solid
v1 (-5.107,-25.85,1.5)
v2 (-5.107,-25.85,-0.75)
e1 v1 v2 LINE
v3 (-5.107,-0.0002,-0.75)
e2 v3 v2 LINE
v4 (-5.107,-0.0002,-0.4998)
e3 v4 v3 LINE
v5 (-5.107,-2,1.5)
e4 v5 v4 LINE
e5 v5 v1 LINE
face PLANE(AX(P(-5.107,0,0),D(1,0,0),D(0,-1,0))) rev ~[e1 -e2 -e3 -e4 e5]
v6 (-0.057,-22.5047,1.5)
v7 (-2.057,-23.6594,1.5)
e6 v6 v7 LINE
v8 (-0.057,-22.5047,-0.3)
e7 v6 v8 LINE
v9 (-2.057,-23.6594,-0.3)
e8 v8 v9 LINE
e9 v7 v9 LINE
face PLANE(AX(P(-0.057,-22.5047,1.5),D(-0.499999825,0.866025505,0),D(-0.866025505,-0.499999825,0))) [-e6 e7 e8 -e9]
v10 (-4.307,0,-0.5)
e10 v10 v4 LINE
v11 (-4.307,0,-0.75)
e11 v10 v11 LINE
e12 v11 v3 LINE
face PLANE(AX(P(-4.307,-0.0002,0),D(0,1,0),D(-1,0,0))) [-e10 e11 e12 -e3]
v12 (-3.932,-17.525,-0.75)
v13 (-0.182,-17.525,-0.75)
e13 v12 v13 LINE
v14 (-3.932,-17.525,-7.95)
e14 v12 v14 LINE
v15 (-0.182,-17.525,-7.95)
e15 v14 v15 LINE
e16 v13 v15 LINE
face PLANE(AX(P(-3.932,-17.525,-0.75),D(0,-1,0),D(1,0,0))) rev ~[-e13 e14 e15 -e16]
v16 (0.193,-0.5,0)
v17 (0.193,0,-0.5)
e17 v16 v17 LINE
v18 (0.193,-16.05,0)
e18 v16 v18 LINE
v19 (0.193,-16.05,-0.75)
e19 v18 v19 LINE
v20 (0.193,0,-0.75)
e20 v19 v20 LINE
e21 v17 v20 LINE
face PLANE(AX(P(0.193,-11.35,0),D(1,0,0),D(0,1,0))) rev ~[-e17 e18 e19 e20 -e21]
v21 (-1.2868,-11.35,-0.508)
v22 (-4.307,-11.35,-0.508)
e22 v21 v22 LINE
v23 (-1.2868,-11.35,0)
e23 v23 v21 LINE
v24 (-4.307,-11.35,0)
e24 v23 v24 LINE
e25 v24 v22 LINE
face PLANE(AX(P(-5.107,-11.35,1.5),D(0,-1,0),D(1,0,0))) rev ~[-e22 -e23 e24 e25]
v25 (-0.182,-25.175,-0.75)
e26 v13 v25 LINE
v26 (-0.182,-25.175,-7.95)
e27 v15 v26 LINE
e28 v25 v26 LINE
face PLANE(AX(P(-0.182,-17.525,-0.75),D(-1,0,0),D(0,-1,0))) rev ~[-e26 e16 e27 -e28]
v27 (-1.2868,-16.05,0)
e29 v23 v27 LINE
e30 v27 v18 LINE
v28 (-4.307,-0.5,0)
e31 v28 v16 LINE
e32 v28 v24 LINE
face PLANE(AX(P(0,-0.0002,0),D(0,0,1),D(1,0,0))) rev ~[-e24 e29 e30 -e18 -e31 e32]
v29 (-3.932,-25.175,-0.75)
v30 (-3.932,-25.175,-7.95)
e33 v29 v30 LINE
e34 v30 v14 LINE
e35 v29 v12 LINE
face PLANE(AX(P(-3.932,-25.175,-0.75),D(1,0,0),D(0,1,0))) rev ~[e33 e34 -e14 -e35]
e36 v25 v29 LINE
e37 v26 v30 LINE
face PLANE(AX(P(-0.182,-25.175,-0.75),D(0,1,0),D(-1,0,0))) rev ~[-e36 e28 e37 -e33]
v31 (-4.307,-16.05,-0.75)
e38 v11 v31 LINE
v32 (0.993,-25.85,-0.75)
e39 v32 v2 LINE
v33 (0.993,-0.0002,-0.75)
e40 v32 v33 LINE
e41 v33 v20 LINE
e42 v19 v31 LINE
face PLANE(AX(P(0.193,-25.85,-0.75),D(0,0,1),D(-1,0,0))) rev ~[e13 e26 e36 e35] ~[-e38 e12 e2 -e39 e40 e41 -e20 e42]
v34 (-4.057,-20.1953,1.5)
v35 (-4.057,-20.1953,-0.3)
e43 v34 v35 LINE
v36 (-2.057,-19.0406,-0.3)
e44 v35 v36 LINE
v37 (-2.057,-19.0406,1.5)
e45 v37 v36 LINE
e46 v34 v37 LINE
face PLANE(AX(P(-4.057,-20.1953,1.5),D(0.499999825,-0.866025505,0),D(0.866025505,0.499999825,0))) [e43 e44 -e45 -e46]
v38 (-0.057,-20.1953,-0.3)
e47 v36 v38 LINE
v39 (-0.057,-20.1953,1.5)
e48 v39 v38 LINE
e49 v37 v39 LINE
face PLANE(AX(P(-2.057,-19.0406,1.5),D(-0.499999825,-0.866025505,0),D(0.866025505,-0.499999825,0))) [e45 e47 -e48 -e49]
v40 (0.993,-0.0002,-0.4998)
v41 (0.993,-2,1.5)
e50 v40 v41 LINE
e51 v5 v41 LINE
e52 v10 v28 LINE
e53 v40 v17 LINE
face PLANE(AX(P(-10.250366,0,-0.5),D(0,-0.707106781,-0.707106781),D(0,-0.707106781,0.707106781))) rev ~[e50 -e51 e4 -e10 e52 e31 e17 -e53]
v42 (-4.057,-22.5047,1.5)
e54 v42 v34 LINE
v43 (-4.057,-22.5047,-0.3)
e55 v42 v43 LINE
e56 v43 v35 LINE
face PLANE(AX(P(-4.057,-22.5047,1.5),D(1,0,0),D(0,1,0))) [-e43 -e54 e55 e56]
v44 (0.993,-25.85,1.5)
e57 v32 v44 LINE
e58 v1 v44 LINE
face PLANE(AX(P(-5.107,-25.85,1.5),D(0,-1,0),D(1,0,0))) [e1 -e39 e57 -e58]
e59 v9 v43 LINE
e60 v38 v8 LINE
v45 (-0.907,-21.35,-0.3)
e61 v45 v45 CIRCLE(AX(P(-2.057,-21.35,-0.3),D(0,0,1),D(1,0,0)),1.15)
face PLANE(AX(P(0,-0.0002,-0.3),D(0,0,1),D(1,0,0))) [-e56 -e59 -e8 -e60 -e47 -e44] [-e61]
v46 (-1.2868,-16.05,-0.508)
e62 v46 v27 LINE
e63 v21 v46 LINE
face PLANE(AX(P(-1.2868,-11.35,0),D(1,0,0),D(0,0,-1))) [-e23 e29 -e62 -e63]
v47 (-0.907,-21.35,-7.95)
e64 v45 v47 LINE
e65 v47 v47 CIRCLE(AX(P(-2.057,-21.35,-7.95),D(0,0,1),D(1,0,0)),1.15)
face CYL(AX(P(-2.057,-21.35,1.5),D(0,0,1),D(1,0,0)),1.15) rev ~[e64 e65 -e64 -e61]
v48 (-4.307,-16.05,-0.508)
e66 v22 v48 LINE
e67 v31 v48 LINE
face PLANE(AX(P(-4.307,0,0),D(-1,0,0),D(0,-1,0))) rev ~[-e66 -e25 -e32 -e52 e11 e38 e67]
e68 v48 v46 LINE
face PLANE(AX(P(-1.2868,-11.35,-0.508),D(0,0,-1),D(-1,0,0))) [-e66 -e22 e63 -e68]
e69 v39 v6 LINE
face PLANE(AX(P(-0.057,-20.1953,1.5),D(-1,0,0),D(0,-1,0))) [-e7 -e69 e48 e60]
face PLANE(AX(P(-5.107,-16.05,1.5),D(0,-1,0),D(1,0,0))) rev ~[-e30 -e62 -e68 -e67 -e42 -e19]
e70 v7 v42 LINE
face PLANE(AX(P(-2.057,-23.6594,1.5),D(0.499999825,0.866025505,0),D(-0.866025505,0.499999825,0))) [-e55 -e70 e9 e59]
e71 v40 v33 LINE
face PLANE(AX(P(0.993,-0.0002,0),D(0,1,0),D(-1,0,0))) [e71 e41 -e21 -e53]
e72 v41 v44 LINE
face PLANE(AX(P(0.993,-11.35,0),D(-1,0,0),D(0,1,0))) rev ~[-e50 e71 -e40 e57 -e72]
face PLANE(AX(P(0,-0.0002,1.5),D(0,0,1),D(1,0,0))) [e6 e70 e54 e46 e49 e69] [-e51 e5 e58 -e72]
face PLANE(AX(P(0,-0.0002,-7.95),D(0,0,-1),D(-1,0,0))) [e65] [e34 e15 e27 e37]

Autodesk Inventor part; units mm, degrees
ref_plane "YZ Plane" through (0, 0, 0) normal (1, 0, 0) x (0, 1, 0)
ref_plane "XZ Plane" through (0, 0, 0) normal (0, 1, 0) x (-1, 0, 0)
ref_plane "XY Plane" through (0, 0, 0) normal (0, 0, 1) x (1, 0, 0)
ref_plane "Work Plane3" through (0, -0.0002, 0) normal (0, 0, 1) x (1, 0, 0)
sketch "Sketch8" plane through (0, -0.0002, 0) normal (0, 0, 1) x (1, 0, 0)
  line L0 (-0.007, 0.0002) -> (-0.007, -15.3498) projected
  line L1 (-0.007, 0.0002) -> (-4.107, 0.0002) projected
  line L2 (-4.107, 0.0002) -> (-4.107, -11.3498) projected
  line L3 (-5.107, -11.3498) -> (0.993, -11.3498)
  line L4 (0.993, -11.3498) -> (0.993, 0.0002)
  line L5 (0.993, 0.0002) -> (-5.107, 0.0002)
  line L6 (-5.107, 0.0002) -> (-5.107, -11.3498)
  line L7 (-4.107, -11.3498) -> (-1.0868, -11.3498) projected
  point P0 (-4.107, 0.0002)
  point P1 (-0.007, 0.0002)
  point P2 (-0.007, -11.3498)
  dimension "d71" = 1
  dimension "d72" = 1
extrude "side" add sketch "Sketch8" along normal blind 1.5
sketch "Sketch14" plane through (0, -0.0002, 0) normal (0, 0, -1) x (-1, 0, 0)
  line L0 (-0.993, 0) -> (5.107, 0) projected
  line L1 (5.107, -11.3498) -> (-0.993, -11.3498) projected
  line L2 (5.107, 0.0002) -> (4.307, 0.0002)
  line L3 (4.307, 0.0002) -> (4.307, -11.3498)
  line L4 (4.307, -11.3498) -> (5.107, -11.3498)
  line L5 (5.107, -11.3498) -> (5.107, 0.0002)
  line L6 (-0.993, -11.3498) -> (-0.193, -11.3498)
  line L7 (-0.193, -11.3498) -> (-0.193, 0.0002)
  line L8 (-0.193, 0.0002) -> (-0.993, 0.0002)
  line L9 (-0.993, 0.0002) -> (-0.993, -11.3498)
  line L10 (4.107, 0.0002) -> (4.107, -11.3498) projected
  line L11 (0.007, 0.0002) -> (0.007, -15.3498) projected
  point P0 (0, 0.0002)
  point P1 (-0.993, 0.0002)
  point P2 (-0.993, 0.0002)
  point P3 (-0.193, 0.0002)
  point P4 (4.307, 0.0002)
  dimension "d73" = 0.2
  dimension "d74" = 0.2
extrude "side_tabs" add sketch "Sketch14" along normal blind 0.75 contours L0 L7 L1 L9 | L0 L5 L1 L3
sketch "Sketch15" plane through (-5.107, -11.35, 1.5) normal (0, -1, 0) x (1, 0, 0)
  line L0 (0.8, -1.5) -> (5.3, -1.5) projected
  line L1 (5.3, -1.5) -> (5.3, -2.25) projected
  line L2 (6.1, -2.25) -> (5.3, -2.25) projected
  line L3 (0, 0) -> (6.1, 0) projected
  line L4 (0.8, -2.25) -> (0, -2.25) projected
  line L5 (0.8, -1.5) -> (0.8, -2.25) projected
  line L6 (5.3, -1.5) -> (0.8, -1.5) projected
  line L7 (1, -1.5) -> (4.0182, -1.5) projected
  line L8 (0.8, -1.5) -> (0.8, -2.25) projected
  line L9 (0.8, -1.5) -> (3.8202, -1.5)
  line L10 (3.8202, -1.5) -> (3.8202, -2.008)
  line L11 (3.8202, -2.008) -> (0.8, -2.008)
  line L12 (0.8, -2.008) -> (0.8, -1.5)
  line L13 (6.1, -2.25) -> (6.1, 0) projected
  line L14 (0, 0) -> (0, -2.25) projected
  line L15 (4.0202, -1.5) -> (4.0202, -2.8009) projected
  point P0 (5.107, -1.5)
  point P1 (3.8202, -1.5)
  dimension "d99" = 0.508
  dimension "d100" = 0.2
extrude "fill_gaps" add sketch "Sketch15" along normal blind 14.5
sketch "Sketch16" plane through (-5.107, -25.85, 1.5) normal (0, -1, 0) x (1, 0, 0)
  line L0 (5.3, -2.25) -> (6.1, -2.25) projected
  line L1 (5.3, -1.5) -> (5.3, -2.25) projected
  line L2 (3.8202, -1.5) -> (5.3, -1.5) projected
  line L3 (3.8202, -2.008) -> (3.8202, -1.5) projected
  line L4 (0.8, -2.008) -> (3.8202, -2.008) projected
  line L5 (0.8, -2.25) -> (0.8, -2.008) projected
  line L6 (0, -2.25) -> (0.8, -2.25) projected
  line L7 (5.3, -2.25) -> (0.8, -2.25)
  point P0 (5.107, -1.5)
extrude "fill_gaps_2" add sketch "Sketch16" against normal blind 9.8
chamfer "Chamfer1" distance 2 angle 45 1 edges at (-2.057, 0, 1.5)
sketch "Sketch17" plane through (0, -0.0002, -0.75) normal (0, 0, -1) x (-1, 0, 0)
  line L0 (0.007, -17.3498) -> (0.007, -25.3498) projected
  line L1 (4.107, -17.3498) -> (0.007, -17.3498) projected
  line L2 (4.107, -25.3498) -> (4.107, -17.3498) projected
  line L3 (0.007, -25.3498) -> (4.107, -25.3498) projected
  line L4 (0.182, -25.1748) -> (3.932, -25.1748)
  line L5 (3.932, -25.1748) -> (3.932, -17.5248)
  line L6 (3.932, -17.5248) -> (0.182, -17.5248)
  line L7 (0.182, -17.5248) -> (0.182, -25.1748)
  point P0 (0, 0.0002)
  dimension "d86" = 0.175
  dimension "d87" = 0.175
  dimension "d88" = 0.175
  dimension "d89" = 0.175
extrude "sliding_block" add sketch "Sketch17" along normal blind 7.2 contours L7 L6 L5 L4
ref_plane "Work Plane4" through (-2.2725, -22.3901, 1.5) normal (0, 0, 1) x (1, 0, 0)
sketch "Sketch19" plane through (-2.2725, -22.3901, 1.5) normal (0, 0, 1) x (1, 0, 0)
  circle A0 centre (0.2155, 1.0401) radius 1.15 projected
  point P0 (2.2725, 22.3901)
extrude "screw_hole" cut sketch "Sketch19" against normal through all
sketch "Sketch20" plane through (0, -0.0002, 1.5) normal (0, 0, 1) x (1, 0, 0)
  line L0 (-2.057, -19.0404) -> (-0.057, -20.1951)
  line L1 (-0.057, -20.1951) -> (-0.057, -22.5045)
  line L2 (-0.057, -22.5045) -> (-2.057, -23.6592)
  line L3 (-2.057, -23.6592) -> (-4.057, -22.5045)
  line L4 (-4.057, -22.5045) -> (-4.057, -20.1951)
  line L5 (-4.057, -20.1951) -> (-2.057, -19.0404)
  circle A0 centre (-2.057, -21.3498) radius 1.15 projected
  point P0 (0, 0.0002)
  dimension "d102" = 4
extrude "nut_slot" cut sketch "Sketch20" against normal blind 1.8 contours L0 L1 L2 L3 L4 L5 | A0
equation "\"d73\" = d74"
equation "\"d86\" = d89"
equation "\"d87\" = d89"
equation "\"d88\" = d89"
properties part number "surgical_holder_side2"
